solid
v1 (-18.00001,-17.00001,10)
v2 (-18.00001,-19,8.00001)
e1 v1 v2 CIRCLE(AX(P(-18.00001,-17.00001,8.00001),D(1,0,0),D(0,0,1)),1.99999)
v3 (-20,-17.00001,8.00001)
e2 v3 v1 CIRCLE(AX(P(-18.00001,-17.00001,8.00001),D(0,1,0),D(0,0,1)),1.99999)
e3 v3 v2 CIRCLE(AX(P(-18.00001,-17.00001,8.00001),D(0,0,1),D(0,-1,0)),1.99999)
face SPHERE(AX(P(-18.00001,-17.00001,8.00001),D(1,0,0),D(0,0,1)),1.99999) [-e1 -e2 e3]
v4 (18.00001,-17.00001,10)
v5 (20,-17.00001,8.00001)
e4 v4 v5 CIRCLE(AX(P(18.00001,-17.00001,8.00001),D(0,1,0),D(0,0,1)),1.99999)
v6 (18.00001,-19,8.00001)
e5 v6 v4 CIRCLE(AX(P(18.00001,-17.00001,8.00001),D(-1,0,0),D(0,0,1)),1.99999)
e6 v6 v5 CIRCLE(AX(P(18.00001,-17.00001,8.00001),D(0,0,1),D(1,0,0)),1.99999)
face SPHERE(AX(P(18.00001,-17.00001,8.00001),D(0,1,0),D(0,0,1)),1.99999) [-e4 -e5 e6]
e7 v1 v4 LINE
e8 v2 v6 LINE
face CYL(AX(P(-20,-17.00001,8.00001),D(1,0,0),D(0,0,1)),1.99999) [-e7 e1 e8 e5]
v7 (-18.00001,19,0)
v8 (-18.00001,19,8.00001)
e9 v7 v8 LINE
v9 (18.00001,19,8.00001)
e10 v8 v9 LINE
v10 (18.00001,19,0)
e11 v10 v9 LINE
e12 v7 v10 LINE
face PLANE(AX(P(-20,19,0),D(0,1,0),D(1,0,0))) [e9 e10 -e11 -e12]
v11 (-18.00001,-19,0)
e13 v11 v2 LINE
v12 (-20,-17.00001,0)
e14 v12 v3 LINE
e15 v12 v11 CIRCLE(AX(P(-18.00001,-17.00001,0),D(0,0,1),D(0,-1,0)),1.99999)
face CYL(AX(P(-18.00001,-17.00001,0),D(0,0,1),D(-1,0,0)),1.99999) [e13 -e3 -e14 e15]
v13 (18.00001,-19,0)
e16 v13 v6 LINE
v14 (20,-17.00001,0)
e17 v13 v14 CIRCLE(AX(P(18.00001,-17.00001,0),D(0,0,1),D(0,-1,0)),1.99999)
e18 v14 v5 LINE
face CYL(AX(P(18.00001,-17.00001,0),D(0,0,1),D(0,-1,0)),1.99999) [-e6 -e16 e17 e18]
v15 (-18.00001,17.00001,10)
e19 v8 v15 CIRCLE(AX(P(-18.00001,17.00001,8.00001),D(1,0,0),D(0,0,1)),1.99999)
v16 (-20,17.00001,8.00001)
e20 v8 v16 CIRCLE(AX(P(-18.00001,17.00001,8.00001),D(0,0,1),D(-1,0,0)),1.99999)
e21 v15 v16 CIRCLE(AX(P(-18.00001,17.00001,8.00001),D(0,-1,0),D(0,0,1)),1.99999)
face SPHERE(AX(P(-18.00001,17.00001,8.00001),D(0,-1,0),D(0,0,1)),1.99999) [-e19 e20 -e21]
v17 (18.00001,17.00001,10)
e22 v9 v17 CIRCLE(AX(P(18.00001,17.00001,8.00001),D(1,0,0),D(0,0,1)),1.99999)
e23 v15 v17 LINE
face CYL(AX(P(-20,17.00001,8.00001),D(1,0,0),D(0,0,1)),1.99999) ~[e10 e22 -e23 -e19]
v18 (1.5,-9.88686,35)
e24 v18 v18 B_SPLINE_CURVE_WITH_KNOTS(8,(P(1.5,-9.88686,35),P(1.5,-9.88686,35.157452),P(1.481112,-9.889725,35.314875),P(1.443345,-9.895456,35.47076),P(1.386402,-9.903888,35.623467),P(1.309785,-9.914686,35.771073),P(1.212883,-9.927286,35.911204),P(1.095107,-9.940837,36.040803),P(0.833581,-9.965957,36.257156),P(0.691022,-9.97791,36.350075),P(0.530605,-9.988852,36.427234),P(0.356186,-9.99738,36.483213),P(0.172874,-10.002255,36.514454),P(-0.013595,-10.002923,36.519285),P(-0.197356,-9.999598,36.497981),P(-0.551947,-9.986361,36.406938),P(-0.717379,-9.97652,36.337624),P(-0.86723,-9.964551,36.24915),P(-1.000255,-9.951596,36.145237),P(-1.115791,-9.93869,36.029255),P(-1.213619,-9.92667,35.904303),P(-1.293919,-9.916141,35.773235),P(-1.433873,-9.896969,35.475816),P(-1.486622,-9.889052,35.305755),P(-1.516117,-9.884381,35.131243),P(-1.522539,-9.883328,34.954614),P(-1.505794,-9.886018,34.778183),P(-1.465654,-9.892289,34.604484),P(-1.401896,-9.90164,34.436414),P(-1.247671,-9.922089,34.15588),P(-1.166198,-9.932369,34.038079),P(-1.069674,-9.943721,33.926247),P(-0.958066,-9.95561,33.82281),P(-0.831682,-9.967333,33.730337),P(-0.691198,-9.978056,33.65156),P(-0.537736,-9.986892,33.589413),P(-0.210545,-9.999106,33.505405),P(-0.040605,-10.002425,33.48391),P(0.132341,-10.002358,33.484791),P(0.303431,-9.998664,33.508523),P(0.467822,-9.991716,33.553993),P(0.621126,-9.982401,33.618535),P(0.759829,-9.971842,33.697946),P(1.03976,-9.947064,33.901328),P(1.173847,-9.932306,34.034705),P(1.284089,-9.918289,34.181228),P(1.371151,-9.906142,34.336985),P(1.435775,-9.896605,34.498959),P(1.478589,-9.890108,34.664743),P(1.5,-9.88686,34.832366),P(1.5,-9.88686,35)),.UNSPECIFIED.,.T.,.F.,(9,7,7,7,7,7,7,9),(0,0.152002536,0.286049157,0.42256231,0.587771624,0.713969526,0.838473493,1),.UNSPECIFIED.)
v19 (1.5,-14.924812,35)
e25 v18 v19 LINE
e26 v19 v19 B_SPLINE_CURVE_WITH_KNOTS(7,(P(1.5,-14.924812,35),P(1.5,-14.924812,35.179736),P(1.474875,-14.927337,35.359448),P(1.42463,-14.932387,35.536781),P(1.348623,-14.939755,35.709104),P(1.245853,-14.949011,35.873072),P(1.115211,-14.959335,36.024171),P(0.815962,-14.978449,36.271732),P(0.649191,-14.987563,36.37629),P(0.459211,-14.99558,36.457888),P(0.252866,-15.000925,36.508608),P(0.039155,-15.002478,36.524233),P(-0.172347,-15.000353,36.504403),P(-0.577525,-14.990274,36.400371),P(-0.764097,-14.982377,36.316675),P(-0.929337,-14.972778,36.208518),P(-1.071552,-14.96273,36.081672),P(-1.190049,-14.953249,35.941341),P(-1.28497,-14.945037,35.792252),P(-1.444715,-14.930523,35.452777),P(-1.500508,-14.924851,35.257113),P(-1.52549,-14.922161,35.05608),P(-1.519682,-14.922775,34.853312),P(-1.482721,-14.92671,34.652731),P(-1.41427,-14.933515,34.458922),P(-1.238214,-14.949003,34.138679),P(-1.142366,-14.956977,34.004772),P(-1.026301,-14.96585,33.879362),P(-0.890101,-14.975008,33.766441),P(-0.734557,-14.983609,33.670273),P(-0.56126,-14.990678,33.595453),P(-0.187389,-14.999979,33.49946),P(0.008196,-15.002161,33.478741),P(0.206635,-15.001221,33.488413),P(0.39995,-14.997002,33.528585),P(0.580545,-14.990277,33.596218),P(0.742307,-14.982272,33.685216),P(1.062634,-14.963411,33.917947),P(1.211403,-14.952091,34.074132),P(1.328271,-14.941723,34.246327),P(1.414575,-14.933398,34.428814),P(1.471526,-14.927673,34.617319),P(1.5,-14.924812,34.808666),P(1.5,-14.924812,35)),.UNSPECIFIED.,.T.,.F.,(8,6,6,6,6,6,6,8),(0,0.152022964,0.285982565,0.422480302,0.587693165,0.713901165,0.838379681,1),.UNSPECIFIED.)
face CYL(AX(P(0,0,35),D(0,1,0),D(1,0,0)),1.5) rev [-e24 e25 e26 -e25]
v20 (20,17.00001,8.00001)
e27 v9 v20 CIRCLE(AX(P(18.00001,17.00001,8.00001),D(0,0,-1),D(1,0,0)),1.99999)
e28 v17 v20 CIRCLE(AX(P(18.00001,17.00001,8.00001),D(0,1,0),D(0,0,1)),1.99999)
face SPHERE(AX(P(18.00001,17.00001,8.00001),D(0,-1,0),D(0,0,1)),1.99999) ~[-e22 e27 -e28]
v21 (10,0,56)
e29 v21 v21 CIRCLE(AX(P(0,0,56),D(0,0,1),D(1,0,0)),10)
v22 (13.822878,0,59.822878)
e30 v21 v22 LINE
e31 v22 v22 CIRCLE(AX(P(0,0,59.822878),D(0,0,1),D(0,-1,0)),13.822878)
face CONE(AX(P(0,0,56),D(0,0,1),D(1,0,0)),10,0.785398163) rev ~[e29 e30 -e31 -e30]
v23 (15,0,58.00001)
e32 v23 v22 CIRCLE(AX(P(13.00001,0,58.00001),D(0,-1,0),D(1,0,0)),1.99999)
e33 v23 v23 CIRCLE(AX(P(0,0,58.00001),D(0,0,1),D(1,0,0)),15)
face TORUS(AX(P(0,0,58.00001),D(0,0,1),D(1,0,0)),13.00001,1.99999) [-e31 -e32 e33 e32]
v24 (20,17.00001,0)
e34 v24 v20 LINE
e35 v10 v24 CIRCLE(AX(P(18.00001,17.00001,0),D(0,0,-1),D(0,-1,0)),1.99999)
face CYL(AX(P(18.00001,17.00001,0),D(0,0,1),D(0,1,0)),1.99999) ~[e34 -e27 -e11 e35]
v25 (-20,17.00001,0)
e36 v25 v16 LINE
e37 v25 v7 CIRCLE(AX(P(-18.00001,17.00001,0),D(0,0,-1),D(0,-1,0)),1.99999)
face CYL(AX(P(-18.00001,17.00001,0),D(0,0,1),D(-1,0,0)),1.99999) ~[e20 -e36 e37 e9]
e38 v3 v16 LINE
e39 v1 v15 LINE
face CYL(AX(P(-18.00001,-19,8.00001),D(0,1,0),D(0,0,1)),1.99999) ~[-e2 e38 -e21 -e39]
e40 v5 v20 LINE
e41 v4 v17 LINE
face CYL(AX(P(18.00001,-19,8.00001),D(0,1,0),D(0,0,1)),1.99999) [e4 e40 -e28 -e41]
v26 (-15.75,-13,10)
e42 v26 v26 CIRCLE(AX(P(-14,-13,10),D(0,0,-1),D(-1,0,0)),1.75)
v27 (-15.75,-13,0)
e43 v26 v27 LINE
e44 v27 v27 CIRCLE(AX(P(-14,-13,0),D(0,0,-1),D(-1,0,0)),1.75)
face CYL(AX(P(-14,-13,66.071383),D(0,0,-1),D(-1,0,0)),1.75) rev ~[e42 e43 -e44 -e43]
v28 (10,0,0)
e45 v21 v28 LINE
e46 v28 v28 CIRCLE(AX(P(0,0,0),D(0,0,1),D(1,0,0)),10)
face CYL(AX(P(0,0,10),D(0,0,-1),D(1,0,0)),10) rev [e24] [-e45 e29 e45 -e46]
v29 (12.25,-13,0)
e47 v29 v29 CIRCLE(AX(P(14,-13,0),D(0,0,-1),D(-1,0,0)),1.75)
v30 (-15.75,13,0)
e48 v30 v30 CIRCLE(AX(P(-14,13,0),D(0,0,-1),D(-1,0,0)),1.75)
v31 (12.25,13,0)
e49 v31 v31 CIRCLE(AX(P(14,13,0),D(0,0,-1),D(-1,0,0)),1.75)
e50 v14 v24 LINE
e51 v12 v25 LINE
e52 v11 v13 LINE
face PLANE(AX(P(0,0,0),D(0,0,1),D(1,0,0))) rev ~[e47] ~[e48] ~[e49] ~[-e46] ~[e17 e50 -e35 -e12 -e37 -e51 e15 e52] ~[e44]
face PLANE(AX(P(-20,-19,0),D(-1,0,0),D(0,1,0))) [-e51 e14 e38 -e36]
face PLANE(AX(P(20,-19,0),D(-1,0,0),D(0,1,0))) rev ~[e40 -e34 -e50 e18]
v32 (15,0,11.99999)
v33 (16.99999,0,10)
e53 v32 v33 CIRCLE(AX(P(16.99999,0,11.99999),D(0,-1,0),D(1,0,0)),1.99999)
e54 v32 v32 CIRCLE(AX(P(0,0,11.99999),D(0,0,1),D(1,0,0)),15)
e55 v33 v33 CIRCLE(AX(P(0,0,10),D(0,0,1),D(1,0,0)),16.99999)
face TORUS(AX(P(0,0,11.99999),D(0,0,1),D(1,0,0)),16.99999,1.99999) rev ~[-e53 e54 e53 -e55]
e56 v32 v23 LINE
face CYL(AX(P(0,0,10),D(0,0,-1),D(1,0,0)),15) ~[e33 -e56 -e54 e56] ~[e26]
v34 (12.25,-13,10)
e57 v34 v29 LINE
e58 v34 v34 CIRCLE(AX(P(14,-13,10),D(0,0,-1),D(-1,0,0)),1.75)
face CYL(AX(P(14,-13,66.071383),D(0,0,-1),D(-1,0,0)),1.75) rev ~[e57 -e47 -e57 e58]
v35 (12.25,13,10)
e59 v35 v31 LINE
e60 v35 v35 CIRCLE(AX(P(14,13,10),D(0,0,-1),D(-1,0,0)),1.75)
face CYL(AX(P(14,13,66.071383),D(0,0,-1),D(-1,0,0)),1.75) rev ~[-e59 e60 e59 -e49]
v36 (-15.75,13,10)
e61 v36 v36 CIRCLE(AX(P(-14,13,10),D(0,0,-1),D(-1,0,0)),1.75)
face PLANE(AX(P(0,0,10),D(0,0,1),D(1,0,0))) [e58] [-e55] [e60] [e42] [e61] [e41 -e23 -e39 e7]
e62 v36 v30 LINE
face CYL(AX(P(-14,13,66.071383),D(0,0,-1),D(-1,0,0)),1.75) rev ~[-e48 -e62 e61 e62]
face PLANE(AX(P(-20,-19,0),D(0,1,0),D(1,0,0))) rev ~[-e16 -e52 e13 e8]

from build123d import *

# Parameters (mm, degrees)
F0_W     = 40
F0_H     = 38
F0_R     = 10
F1_DEPTH = 10
F4_D     = 3.5
F2_R     = 15
F2_R_2   = 10
F5_DEPTH = 50
F6_R     = 1.5
F7_DEPTH = 25
F8_R     = 1.99999


# Not quite as in the source:
# - a fillet or chamfer that OpenCascade refuses, or shapes differently, is made with other operations: its cross-section is extruded or revolved along the edge and cut away or added
# - a fillet or chamfer is up to 0.001 mm smaller than in the source, because OpenCascade refuses the exact size


with BuildPart() as f1:
    # F0 (on Top) → F1 (new body)
    with BuildSketch(Plane.XY):
        Rectangle(F0_W, F0_H)
        Circle(F0_R, mode=Mode.SUBTRACT)
    extrude(amount=F1_DEPTH)

    # F4 (through all)
    with Locations(Plane.XY.offset(10)):
        with Locations((-14, 13), (-14, -13), (14, -13), (14, 13)):
            Hole(F4_D / 2)

    # F2 (on face) → F5 (join)
    with BuildSketch(Plane.XY.offset(10)):
        Circle(F2_R)
        Circle(F2_R_2, mode=Mode.SUBTRACT)
    extrude(amount=F5_DEPTH)

    # F6 (on Front) → F7 (cut)
    with BuildSketch(Plane.XZ):
        with Locations((0, 35)):
            Circle(F6_R)
    extrude(amount=F7_DEPTH, mode=Mode.SUBTRACT)

    # F8 (radius 2 in the source; OpenCascade refuses exactly that, so slightly less here)
    f8_edges = [f1.edges().sort_by_distance(p)[0] for p in [
        (-15, 0, 10),
        (20, 0, 10),
        (0, -19, 10),
        (-20, 0, 10),
        (0, 19, 10),
        (20, 19, 5),
        (-20, -19, 5),
        (20, -19, 5),
        (-15, 0, 60),
        (-20, 19, 5),
    ]]
    fillet(f8_edges, radius=F8_R)

    # F9: chamfer of 4 on 1 edges, made by hand

    # F9_s1 → F9_t2 (revolve, cut)
    with BuildSketch(Plane.XZ):
        Polygon((10, 56), (14, 60), (10, 60), align=None)
    revolve(axis=Axis((0, 0, 60), (0, 0, 1)), mode=Mode.SUBTRACT)


solid = f1.part
